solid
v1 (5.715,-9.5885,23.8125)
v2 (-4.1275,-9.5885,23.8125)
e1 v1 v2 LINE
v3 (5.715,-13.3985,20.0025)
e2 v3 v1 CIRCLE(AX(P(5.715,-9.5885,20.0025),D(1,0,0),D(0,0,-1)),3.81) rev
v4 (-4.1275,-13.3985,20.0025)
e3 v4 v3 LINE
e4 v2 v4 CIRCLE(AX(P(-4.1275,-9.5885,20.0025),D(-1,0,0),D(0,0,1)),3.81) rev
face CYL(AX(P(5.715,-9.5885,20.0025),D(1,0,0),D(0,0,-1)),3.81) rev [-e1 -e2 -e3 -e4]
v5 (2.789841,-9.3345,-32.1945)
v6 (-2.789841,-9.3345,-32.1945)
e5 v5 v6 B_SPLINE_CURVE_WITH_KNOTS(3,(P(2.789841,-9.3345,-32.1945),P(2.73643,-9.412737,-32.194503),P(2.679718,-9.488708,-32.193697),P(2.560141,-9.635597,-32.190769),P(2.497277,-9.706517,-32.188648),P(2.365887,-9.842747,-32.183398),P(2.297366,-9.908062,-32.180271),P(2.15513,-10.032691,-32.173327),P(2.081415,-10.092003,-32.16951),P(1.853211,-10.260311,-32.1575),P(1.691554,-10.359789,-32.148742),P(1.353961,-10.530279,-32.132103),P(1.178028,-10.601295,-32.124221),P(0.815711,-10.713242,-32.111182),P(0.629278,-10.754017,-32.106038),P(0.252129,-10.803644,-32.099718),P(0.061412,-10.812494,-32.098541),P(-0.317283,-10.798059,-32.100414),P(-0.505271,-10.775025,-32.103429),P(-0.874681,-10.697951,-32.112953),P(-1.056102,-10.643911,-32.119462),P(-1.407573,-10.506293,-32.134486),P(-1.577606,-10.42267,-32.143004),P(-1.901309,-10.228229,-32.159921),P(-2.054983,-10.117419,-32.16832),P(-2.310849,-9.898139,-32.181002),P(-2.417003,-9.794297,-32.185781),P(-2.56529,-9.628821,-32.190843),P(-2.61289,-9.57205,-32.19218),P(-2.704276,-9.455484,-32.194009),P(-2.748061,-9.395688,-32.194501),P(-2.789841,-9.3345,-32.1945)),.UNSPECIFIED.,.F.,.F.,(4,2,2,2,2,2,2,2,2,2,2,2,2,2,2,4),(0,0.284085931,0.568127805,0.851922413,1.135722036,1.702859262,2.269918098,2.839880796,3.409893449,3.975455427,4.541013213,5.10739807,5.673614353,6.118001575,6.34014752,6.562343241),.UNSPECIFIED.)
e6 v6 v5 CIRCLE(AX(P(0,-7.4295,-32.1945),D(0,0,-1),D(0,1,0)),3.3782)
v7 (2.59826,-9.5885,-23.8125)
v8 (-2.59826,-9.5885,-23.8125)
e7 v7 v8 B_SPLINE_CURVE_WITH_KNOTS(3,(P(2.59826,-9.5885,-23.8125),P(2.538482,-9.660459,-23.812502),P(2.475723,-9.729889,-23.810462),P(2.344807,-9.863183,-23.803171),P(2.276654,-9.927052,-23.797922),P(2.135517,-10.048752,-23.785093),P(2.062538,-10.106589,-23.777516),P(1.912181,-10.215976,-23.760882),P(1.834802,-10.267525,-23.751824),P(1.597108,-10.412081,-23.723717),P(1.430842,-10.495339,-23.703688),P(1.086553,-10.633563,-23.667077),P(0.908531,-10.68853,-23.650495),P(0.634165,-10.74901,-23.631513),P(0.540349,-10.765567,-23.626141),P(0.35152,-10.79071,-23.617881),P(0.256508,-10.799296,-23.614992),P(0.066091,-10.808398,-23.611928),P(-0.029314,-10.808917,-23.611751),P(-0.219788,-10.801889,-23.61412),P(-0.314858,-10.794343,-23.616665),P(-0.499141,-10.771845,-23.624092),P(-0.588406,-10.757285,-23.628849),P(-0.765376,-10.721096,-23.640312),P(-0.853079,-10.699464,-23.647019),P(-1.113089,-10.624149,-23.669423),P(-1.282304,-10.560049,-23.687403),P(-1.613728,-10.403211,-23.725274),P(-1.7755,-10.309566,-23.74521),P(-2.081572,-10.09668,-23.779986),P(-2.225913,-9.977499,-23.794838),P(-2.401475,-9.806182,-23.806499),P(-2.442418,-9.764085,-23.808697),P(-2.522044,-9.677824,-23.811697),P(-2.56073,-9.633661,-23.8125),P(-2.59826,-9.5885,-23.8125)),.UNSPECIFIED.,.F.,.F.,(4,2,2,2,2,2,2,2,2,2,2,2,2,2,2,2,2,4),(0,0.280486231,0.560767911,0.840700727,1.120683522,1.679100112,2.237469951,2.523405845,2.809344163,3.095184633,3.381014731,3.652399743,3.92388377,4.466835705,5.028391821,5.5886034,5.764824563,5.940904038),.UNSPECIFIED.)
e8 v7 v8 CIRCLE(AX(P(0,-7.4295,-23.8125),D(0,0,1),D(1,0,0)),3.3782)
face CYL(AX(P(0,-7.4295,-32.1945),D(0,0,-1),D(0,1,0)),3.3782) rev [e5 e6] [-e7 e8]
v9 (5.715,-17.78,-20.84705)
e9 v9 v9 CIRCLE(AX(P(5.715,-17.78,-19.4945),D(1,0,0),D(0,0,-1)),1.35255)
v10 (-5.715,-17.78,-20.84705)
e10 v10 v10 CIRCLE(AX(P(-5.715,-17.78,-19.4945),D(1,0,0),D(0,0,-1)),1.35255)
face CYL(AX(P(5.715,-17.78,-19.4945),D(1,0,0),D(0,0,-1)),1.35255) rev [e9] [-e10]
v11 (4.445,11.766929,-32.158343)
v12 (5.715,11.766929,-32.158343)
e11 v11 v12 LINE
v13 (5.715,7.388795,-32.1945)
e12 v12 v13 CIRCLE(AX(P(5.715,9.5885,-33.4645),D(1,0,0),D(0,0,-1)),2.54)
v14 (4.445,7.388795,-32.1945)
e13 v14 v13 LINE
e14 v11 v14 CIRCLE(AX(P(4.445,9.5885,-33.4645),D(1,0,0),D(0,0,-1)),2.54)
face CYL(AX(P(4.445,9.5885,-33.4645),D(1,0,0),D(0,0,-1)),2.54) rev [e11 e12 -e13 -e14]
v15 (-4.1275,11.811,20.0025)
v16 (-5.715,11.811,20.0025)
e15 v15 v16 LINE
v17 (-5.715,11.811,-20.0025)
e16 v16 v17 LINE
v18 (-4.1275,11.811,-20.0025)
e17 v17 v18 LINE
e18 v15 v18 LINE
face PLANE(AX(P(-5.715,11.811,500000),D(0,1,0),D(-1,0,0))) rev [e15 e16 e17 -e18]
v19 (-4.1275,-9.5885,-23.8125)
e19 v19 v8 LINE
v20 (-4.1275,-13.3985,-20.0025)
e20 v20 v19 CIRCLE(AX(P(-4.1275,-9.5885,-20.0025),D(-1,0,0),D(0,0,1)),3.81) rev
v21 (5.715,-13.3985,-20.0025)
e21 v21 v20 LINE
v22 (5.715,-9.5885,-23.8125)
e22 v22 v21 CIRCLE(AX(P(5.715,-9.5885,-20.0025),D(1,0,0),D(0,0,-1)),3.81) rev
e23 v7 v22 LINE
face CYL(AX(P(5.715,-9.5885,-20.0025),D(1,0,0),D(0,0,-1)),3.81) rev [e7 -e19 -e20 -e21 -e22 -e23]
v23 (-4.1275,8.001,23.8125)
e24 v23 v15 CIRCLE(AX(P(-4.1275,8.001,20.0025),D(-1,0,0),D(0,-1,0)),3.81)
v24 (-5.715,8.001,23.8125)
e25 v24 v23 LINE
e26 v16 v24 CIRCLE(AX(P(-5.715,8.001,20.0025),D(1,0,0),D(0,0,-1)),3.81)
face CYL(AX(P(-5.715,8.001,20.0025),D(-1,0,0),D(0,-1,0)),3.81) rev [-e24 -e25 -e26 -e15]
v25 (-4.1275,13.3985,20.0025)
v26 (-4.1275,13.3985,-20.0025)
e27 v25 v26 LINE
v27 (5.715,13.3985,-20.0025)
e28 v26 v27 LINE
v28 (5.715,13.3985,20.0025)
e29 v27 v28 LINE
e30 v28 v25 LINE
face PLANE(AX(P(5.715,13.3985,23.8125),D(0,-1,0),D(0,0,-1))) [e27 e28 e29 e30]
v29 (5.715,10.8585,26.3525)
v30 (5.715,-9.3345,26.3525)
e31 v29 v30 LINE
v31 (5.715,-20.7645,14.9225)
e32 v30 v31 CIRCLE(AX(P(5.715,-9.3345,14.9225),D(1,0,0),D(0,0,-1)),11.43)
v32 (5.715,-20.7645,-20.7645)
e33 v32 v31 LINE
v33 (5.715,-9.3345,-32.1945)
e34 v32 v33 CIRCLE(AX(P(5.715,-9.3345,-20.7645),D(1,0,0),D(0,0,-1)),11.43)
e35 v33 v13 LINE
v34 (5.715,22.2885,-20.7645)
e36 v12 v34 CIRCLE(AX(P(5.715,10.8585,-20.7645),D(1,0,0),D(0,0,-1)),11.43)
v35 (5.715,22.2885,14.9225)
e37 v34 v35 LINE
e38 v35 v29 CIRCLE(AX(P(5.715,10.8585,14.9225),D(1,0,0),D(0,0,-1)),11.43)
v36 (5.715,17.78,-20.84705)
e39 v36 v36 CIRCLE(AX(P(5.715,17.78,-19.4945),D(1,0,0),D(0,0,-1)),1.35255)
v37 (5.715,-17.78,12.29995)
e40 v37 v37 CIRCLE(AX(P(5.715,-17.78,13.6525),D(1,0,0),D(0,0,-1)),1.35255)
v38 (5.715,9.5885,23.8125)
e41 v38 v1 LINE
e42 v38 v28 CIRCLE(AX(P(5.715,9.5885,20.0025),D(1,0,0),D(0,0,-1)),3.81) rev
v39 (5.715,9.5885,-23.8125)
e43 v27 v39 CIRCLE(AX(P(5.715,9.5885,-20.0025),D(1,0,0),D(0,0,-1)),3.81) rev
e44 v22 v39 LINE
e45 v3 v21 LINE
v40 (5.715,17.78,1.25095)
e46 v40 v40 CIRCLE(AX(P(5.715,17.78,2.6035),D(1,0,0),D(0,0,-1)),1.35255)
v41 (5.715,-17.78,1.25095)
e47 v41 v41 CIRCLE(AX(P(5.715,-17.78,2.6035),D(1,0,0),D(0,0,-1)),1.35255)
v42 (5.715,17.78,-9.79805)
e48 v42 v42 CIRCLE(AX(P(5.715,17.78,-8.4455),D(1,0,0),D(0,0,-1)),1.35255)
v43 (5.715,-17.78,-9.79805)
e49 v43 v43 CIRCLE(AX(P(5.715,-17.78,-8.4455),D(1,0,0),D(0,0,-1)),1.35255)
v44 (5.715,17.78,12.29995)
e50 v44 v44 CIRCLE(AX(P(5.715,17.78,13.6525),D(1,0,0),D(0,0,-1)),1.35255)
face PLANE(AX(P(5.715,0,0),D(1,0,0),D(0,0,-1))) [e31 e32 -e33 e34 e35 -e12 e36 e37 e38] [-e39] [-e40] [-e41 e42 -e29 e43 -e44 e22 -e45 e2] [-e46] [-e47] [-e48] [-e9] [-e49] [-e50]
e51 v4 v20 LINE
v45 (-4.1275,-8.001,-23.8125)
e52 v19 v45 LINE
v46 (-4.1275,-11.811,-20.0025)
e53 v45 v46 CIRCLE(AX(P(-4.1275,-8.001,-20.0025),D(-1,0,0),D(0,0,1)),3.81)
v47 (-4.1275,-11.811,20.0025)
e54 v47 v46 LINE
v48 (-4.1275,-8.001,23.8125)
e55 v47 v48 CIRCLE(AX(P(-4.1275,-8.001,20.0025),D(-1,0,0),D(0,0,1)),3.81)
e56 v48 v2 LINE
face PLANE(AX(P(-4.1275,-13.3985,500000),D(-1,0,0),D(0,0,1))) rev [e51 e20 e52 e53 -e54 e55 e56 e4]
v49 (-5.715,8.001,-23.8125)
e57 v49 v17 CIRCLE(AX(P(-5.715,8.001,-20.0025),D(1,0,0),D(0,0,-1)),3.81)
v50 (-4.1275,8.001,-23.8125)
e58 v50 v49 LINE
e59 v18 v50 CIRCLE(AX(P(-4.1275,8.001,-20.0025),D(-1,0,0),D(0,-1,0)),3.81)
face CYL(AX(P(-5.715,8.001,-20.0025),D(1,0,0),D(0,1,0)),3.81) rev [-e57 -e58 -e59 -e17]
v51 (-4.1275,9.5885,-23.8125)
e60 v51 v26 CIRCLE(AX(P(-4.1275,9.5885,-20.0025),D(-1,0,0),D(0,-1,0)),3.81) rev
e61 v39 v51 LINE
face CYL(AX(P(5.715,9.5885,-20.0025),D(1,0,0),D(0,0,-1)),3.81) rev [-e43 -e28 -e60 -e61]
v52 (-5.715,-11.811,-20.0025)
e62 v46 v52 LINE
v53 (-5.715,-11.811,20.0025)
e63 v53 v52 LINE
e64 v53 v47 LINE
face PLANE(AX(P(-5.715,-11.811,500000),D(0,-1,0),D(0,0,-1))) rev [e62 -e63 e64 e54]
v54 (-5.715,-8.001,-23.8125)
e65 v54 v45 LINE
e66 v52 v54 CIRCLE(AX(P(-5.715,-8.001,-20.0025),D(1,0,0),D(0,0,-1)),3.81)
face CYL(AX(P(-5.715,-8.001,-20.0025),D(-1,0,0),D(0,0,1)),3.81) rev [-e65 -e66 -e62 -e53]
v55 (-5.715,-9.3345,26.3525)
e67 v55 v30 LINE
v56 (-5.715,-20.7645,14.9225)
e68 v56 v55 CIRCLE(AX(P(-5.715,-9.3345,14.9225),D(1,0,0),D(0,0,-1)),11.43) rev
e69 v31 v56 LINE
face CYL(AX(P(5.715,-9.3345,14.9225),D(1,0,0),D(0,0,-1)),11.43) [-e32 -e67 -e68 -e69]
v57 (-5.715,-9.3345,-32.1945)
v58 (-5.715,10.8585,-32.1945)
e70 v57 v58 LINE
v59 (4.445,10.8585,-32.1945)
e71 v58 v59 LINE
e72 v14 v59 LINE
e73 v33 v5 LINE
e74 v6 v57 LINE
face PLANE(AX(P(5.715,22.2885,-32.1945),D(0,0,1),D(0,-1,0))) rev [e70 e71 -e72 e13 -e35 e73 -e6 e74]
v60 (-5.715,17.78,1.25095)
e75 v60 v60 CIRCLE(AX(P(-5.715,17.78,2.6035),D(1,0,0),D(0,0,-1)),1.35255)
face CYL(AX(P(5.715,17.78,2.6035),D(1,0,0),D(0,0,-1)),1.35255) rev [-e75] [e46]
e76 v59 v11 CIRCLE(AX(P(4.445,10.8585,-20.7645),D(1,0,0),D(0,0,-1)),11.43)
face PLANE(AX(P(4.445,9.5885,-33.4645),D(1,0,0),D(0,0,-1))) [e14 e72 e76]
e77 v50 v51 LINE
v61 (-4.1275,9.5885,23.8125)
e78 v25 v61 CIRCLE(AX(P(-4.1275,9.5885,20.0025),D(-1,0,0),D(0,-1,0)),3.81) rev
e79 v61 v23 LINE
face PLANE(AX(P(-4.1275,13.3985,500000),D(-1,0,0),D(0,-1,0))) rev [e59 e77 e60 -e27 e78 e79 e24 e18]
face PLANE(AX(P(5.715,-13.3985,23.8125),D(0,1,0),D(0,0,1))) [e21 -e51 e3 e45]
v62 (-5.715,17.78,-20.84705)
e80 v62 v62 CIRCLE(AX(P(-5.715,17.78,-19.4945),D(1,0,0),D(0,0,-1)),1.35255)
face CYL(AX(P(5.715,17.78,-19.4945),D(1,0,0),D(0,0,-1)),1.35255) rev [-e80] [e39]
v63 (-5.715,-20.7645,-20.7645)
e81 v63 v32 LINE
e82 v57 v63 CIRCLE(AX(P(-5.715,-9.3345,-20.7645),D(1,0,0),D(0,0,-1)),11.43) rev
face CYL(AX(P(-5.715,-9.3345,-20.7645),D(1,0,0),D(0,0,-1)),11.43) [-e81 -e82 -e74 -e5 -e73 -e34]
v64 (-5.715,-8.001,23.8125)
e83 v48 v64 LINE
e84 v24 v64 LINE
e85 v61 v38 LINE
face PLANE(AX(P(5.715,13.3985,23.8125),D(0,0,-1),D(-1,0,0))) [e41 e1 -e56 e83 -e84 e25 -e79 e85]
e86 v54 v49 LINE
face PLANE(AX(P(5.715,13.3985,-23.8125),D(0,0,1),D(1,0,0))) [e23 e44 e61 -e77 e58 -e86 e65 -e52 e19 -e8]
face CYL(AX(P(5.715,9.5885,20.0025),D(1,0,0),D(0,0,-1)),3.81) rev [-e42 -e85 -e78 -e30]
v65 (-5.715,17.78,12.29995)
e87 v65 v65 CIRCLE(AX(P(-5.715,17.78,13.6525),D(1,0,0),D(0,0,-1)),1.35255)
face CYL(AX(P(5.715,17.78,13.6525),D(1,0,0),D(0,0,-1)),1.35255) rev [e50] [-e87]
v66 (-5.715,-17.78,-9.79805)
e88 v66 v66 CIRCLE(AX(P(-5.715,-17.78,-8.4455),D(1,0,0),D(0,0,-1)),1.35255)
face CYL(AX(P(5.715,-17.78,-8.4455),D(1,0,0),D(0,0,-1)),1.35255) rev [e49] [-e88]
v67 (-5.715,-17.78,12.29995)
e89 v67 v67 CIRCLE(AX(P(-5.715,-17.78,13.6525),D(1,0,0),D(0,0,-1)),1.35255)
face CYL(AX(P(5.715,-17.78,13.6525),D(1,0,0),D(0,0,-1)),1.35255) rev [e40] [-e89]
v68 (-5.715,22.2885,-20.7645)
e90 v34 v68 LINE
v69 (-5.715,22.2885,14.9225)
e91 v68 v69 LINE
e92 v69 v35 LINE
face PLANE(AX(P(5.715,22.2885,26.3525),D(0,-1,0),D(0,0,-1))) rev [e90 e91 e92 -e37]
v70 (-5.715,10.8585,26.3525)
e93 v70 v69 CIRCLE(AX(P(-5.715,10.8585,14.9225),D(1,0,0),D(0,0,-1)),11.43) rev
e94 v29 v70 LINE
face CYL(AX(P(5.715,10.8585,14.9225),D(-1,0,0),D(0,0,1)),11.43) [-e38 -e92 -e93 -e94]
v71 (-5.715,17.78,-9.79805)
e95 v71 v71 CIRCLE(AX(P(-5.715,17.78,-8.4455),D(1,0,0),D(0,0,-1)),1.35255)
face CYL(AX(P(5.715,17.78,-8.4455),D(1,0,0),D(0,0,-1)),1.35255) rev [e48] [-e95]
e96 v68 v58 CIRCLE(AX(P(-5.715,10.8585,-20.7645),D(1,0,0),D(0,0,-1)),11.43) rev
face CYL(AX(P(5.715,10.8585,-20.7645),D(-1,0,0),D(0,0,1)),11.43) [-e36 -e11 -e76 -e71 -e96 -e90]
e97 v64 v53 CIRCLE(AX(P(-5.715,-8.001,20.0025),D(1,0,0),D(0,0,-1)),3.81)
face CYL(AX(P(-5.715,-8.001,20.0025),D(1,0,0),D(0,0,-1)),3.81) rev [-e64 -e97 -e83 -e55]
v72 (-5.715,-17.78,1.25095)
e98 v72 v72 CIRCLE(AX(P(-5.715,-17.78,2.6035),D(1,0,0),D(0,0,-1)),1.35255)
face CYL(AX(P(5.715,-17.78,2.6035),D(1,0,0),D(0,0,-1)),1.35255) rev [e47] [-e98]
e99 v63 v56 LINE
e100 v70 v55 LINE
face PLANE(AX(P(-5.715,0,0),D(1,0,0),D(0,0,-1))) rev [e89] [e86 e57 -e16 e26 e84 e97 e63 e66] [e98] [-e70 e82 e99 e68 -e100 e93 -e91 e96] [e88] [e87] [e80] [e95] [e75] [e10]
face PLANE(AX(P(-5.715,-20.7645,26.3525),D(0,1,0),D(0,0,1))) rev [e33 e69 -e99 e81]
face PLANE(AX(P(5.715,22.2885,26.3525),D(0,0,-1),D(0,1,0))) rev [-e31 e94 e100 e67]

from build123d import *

# Parameters (mm, degrees)
SKETCH1_W                   = 58.547
SKETCH1_H                   = 44.577
SKETCH1_W_2                 = 47.625
SKETCH1_H_2                 = 26.797
BOSS_EXTRUDE1_DEPTH         = 5.715
BOSS_EXTRUDE2_REACH         = 57.19
SKETCH9_W                   = 1.5875
SKETCH9_H                   = 1.5875
FILLET11_R                  = 3.81
FILLET12_R                  = 3.81
SKETCH21_R                  = 2.54
CUT_EXTRUDE3_DEPTH          = 1.27
F_1_4_CLEARANCE_HOLE1_D     = 6.7564
F_1_4_CLEARANCE_HOLE1_DEPTH = 8.89
F_1_4_CLEARANCE_HOLE1_TIP   = 2.029827343
F_6_32_TAPPED_HOLE1_D       = 2.7051
SKETCH22_W                  = 58.547
SKETCH22_H                  = 7.441182991
CUT_EXTRUDE4_DEPTH          = 41.791028045
FILLET13_R                  = 11.43
FILLET14_R                  = 11.43


with BuildPart() as part:
    # Sketch1 → Boss-Extrude1 (new, symmetric)
    with BuildSketch(Plane(origin=(0, 0, 0), x_dir=(0, 0, -1), z_dir=(1, 0, 0))):
        with Locations((2.921, 0)):
            Rectangle(SKETCH1_W, SKETCH1_H)
        Rectangle(SKETCH1_W_2, SKETCH1_H_2, mode=Mode.SUBTRACT)
    extrude(amount=BOSS_EXTRUDE1_DEPTH, both=True)

    # Sketch9 → Boss-Extrude2 (add, up to next)
    with BuildSketch(Plane.XY.offset(-23.8125), mode=Mode.PRIVATE) as boss_extrude2_sk1:
        with Locations((-4.92125, 12.60475)):
            Rectangle(SKETCH9_W, SKETCH9_H)
    boss_extrude2_tool1 = extrude(boss_extrude2_sk1.sketch, amount=BOSS_EXTRUDE2_REACH, mode=Mode.PRIVATE) - part.part
    # Sketch9 → Boss-Extrude2 (add, up to next)
    with BuildSketch(Plane.XY.offset(-23.8125), mode=Mode.PRIVATE) as boss_extrude2_sk2:
        with Locations((-4.92125, -12.60475)):
            Rectangle(SKETCH9_W, SKETCH9_H)
    boss_extrude2_tool2 = extrude(boss_extrude2_sk2.sketch, amount=BOSS_EXTRUDE2_REACH, mode=Mode.PRIVATE) - part.part
    add(boss_extrude2_tool1.solids().sort_by_distance((-4.92125, 12.60475, -23.8125))[0])
    add(boss_extrude2_tool2.solids().sort_by_distance((-4.92125, -12.60475, -23.8125))[0])

    # Fillet11
    fillet11_edges = [part.edges().sort_by_distance(p)[0] for p in [
        (-4.92125, -11.811, 23.8125),
        (-4.92125, -11.811, -23.8125),
        (-4.92125, 11.811, 23.8125),
        (-4.92125, 11.811, -23.8125),
    ]]
    fillet(fillet11_edges, radius=FILLET11_R)

    # Fillet12
    fillet12_edges = [part.edges().sort_by_distance(p)[0] for p in [
        (0.79375, 13.3985, 23.8125),
        (0.79375, -13.3985, 23.8125),
        (0.79375, -13.3985, -23.8125),
        (0.79375, 13.3985, -23.8125),
    ]]
    fillet(fillet12_edges, radius=FILLET12_R)

    # Sketch21 → Cut-Extrude3 (cut)
    with BuildSketch(Plane(origin=(5.715, 0, 0), x_dir=(0, 0, -1), z_dir=(1, 0, 0))):
        with Locations((33.4645, 9.5885)):
            Circle(SKETCH21_R)
    extrude(amount=-CUT_EXTRUDE3_DEPTH, mode=Mode.SUBTRACT)

    # 1/4 Clearance Hole1
    with Locations(Plane(origin=(-2.530789808, 6.493019647, -32.1945), x_dir=(1, 0, 0), z_dir=(0, 0, -1))):
        with Locations((2.530789808, 13.922519647)):
            Hole(F_1_4_CLEARANCE_HOLE1_D / 2, depth=F_1_4_CLEARANCE_HOLE1_DEPTH)
            with Locations((0, 0, -(F_1_4_CLEARANCE_HOLE1_DEPTH + F_1_4_CLEARANCE_HOLE1_TIP / 2))):  # 118° drill point
                Cone(0, F_1_4_CLEARANCE_HOLE1_D / 2, F_1_4_CLEARANCE_HOLE1_TIP, mode=Mode.SUBTRACT)

    # #6-32 Tapped Hole1 (through all)
    with Locations(Plane(origin=(5.715, 17.955600219, 19.212274833), x_dir=(0, 0, 1), z_dir=(1, 0, 0))):
        with Locations((-27.657774833, 0.175600219), (-16.608774833, 0.175600219), (-5.559774833, 0.175600219), (-38.706774833, 0.175600219), (-38.706774833, 35.735600219), (-27.657774833, 35.735600219), (-16.608774833, 35.735600219), (-5.559774833, 35.735600219)):
            Hole(F_6_32_TAPPED_HOLE1_D / 2)

    # Sketch22 → Cut-Extrude4 (cut, through all)
    with BuildSketch(Plane(origin=(5.715, 0, 0), x_dir=(0, 0, -1), z_dir=(1, 0, 0))):
        with Locations((2.921, -24.485091496)):
            Rectangle(SKETCH22_W, SKETCH22_H)
    extrude(amount=-CUT_EXTRUDE4_DEPTH, mode=Mode.SUBTRACT)

    # Fillet13
    # the kernel refuses this fillet: 11.43 mm, written as the material it takes off along each edge
    with BuildSketch(Plane(origin=(34.29, 22.2885, -32.1945), x_dir=(0, -1, 0), z_dir=(-1, 0, 0)), Plane(origin=(34.29, -20.7645, -32.1945), x_dir=(0, 0, 1), z_dir=(-1, 0, 0))) as fillet13_piece_1:
        with BuildLine():
            CenterArc((FILLET13_R, FILLET13_R), FILLET13_R, 180, 90)
            Line((0, FILLET13_R), (0, 0))
            Line((0, 0), (FILLET13_R, 0))
        make_face()
    extrude(amount=68.58, mode=Mode.SUBTRACT)

    # Fillet14
    fillet14_edges = [part.edges().sort_by_distance(p)[0] for p in [
        (0, -20.7645, 26.3525),
        (0, 22.2885, 26.3525),
    ]]
    fillet(fillet14_edges, radius=FILLET14_R)


solid = part.part
